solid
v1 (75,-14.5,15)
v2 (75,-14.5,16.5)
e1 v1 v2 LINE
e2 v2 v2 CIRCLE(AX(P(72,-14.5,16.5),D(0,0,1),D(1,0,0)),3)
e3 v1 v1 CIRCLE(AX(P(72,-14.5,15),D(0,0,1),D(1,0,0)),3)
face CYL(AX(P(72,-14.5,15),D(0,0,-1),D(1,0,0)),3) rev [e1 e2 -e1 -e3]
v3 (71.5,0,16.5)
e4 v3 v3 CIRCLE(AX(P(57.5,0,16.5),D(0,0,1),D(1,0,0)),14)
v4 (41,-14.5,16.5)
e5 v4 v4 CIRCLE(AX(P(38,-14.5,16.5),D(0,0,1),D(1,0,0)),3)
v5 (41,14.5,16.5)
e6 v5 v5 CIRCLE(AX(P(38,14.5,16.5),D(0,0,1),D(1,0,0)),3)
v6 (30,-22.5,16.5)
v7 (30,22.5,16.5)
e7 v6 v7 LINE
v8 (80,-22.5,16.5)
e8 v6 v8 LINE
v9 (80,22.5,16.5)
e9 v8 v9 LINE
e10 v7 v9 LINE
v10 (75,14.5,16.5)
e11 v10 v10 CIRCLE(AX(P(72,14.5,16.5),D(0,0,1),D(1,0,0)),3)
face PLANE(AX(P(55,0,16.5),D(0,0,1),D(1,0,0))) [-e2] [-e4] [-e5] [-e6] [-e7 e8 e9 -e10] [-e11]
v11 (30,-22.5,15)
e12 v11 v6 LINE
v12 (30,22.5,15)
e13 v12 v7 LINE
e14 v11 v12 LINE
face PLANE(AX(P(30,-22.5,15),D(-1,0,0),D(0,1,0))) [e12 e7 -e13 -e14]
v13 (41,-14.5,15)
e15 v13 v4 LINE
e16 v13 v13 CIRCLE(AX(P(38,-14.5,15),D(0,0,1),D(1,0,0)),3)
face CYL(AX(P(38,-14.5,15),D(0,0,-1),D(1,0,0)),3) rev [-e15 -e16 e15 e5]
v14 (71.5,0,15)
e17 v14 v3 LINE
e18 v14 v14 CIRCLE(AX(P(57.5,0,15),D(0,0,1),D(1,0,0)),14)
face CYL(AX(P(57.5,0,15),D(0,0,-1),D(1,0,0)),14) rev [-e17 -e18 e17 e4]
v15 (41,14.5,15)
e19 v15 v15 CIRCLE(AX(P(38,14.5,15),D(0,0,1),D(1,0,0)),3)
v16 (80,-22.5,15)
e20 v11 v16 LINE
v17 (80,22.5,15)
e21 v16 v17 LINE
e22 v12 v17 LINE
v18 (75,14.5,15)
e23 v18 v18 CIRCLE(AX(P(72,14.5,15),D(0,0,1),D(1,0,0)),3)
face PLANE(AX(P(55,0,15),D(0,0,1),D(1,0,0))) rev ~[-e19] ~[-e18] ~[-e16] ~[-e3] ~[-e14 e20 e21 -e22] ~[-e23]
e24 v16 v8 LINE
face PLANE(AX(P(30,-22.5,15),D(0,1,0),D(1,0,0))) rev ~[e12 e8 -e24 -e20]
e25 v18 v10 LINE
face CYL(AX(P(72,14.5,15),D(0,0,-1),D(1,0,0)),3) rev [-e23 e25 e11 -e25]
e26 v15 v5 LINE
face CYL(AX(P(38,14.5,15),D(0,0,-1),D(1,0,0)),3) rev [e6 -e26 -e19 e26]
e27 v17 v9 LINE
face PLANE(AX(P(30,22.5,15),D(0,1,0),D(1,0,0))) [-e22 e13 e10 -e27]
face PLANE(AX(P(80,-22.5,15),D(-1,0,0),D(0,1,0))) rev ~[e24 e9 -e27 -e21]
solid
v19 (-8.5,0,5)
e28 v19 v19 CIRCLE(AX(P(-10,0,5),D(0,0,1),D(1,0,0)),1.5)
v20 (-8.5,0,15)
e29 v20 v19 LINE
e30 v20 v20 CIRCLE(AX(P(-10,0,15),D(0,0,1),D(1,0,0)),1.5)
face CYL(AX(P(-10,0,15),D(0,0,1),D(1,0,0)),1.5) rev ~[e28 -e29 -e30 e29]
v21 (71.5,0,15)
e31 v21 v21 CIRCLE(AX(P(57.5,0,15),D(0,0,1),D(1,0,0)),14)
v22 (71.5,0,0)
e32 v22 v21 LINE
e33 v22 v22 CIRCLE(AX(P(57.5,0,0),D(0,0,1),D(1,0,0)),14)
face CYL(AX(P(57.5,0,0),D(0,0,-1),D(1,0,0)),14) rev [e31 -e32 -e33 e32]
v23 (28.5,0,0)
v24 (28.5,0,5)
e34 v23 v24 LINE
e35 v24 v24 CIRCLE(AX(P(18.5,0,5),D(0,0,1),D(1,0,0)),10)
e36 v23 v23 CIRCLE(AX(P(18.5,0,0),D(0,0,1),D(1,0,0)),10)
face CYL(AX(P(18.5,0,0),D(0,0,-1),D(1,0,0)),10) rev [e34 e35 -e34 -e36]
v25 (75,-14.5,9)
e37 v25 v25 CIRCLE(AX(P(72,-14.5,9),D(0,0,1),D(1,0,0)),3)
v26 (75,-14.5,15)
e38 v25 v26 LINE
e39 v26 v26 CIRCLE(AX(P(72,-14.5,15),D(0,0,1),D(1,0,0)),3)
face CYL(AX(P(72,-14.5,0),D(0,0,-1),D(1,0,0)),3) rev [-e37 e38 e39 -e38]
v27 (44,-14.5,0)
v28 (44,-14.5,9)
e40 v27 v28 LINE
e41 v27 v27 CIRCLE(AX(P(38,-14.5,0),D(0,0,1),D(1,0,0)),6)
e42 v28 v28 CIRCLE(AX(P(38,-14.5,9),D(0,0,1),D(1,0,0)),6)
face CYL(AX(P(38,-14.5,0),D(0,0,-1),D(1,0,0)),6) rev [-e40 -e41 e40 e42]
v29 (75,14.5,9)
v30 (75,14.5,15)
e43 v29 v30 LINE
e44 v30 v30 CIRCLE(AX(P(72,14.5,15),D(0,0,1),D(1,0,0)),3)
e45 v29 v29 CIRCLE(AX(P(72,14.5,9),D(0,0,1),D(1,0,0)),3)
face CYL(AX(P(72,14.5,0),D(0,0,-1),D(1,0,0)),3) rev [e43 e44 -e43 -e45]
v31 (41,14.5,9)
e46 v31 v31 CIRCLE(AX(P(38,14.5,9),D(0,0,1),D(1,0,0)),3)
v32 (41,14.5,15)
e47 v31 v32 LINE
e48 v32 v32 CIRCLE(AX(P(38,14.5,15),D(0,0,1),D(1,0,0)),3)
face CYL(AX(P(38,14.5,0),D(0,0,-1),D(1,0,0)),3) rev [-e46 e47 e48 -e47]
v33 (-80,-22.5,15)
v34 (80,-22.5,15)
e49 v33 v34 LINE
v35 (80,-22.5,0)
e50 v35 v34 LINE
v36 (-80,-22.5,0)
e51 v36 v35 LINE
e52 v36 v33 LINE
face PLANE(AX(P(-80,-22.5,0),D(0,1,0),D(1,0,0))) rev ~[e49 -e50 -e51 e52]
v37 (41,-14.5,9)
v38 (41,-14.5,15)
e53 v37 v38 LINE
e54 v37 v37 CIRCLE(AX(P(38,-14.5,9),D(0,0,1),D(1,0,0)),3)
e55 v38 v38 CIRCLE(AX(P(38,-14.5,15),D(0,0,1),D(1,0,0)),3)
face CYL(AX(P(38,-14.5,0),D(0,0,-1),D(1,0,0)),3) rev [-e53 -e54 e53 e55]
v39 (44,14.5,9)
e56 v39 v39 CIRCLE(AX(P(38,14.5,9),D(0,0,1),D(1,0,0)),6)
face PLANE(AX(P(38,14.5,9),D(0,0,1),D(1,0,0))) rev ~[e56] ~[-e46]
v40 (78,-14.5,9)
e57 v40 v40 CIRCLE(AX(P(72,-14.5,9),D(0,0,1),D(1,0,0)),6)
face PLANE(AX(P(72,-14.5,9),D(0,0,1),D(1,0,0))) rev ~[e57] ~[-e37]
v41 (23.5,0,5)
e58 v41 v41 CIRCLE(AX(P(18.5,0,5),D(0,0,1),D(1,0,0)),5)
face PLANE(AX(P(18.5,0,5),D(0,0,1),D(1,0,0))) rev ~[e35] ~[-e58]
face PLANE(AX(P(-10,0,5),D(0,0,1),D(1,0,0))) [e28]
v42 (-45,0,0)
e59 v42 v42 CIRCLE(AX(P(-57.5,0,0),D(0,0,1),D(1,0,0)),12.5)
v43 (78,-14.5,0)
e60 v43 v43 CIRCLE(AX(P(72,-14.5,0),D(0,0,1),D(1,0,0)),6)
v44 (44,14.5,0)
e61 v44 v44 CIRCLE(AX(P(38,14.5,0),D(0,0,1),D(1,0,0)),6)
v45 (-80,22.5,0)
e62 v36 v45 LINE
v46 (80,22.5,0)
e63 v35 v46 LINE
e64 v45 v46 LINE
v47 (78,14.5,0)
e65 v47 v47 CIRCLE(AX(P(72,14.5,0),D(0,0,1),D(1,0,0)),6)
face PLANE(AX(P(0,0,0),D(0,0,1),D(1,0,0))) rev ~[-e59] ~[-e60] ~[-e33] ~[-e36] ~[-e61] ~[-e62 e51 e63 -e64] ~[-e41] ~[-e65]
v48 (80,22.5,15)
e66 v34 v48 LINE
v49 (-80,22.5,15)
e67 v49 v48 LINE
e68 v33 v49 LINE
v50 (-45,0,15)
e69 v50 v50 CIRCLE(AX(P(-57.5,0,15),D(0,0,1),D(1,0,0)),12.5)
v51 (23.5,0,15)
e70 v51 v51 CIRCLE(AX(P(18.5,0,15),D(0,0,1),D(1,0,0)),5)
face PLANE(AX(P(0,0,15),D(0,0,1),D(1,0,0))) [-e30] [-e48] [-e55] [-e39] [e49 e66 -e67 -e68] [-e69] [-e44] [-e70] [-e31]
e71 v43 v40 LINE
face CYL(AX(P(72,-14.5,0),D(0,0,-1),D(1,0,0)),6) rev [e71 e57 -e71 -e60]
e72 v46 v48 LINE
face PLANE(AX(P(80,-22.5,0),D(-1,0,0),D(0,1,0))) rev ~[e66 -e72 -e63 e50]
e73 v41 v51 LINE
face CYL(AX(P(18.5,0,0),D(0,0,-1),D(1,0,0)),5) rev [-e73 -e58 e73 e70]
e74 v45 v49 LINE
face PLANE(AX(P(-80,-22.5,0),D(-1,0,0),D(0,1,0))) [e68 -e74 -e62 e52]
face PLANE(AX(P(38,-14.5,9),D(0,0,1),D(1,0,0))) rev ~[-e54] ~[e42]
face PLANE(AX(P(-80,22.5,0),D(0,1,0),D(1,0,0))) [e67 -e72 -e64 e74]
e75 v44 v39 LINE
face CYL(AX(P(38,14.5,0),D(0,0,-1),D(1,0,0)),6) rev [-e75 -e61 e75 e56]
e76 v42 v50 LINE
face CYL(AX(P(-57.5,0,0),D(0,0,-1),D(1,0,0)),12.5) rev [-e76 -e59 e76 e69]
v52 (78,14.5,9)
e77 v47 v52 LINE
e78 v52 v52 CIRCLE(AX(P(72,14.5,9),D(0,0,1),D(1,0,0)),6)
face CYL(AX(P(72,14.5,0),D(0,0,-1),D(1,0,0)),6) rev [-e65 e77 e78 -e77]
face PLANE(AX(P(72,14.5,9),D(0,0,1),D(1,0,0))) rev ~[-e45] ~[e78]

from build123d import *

# Parameters (mm, degrees)
F0_W     = 160
F0_H     = 45
F0_R     = 6
F0_R_2   = 12.5
F0_R_3   = 10
F0_R_4   = 14
F0_R_5   = 5
F0_R_6   = 3
F1_DEPTH = 15
F2_DEPTH = 5
F3_DEPTH = 9
F4_R     = 1.5
F5_DEPTH = 10
F6_W     = 50
F6_H     = 45
F6_R     = 3
F6_R_2   = 14
F7_DEPTH = 1.5


# Not quite as in the source:
# - a feature names something its author has since deleted; it is built from what else it names


with BuildPart() as f1:
    # F0 (on Top) → F1 (new body)
    with BuildSketch(Plane.XY):
        Rectangle(F0_W, F0_H)
        with Locations((38, -14.5)):
            Circle(F0_R, mode=Mode.SUBTRACT)
        with Locations((72, -14.5)):
            Circle(F0_R, mode=Mode.SUBTRACT)
        with Locations((-57.5, 0)):
            Circle(F0_R_2, mode=Mode.SUBTRACT)
        with Locations((18.5, 0)):
            Circle(F0_R_3, mode=Mode.SUBTRACT)
        with Locations((57.5, 0)):
            Circle(F0_R_4, mode=Mode.SUBTRACT)
        with Locations((38, 14.5)):
            Circle(F0_R, mode=Mode.SUBTRACT)
        with Locations((72, 14.5)):
            Circle(F0_R, mode=Mode.SUBTRACT)
        with Locations((18.5, 0)):
            Circle(F0_R_3)
        with Locations((18.5, 0)):
            Circle(F0_R_5, mode=Mode.SUBTRACT)
        with Locations((38, -14.5)):
            Circle(F0_R)
        with Locations((38, -14.5)):
            Circle(F0_R_6, mode=Mode.SUBTRACT)
        with Locations((72, -14.5)):
            Circle(F0_R)
        with Locations((72, -14.5)):
            Circle(F0_R_6, mode=Mode.SUBTRACT)
        with Locations((72, 14.5)):
            Circle(F0_R)
        with Locations((72, 14.5)):
            Circle(F0_R_6, mode=Mode.SUBTRACT)
        with Locations((38, 14.5)):
            Circle(F0_R)
        with Locations((38, 14.5)):
            Circle(F0_R_6, mode=Mode.SUBTRACT)
    extrude(amount=F1_DEPTH)

    # F0 (on Top) → F2 (cut)
    with BuildSketch(Plane.XY):
        with Locations((18.5, 0)):
            Circle(F0_R_3)
        with Locations((18.5, 0)):
            Circle(F0_R_5, mode=Mode.SUBTRACT)
    extrude(amount=F2_DEPTH, mode=Mode.SUBTRACT)

    # F0 (on Top) → F3 (cut)
    with BuildSketch(Plane.XY):
        with Locations((38, -14.5)):
            Circle(F0_R)
        with Locations((38, -14.5)):
            Circle(F0_R_6, mode=Mode.SUBTRACT)
        with Locations((72, -14.5)):
            Circle(F0_R)
        with Locations((72, -14.5)):
            Circle(F0_R_6, mode=Mode.SUBTRACT)
        with Locations((72, 14.5)):
            Circle(F0_R)
        with Locations((72, 14.5)):
            Circle(F0_R_6, mode=Mode.SUBTRACT)
        with Locations((38, 14.5)):
            Circle(F0_R)
        with Locations((38, 14.5)):
            Circle(F0_R_6, mode=Mode.SUBTRACT)
    extrude(amount=F3_DEPTH, mode=Mode.SUBTRACT)

    # F4 (on face) → F5 (cut)
    with BuildSketch(Plane.XY.offset(15)):
        with Locations((-10, 0)):
            Circle(F4_R)
    extrude(amount=-F5_DEPTH, mode=Mode.SUBTRACT)


with BuildPart() as f7:
    # F6 (on face) → F7 (new body)
    with BuildSketch(Plane.XY.offset(15)):
        with Locations((55, 0)):
            Rectangle(F6_W, F6_H)
        with Locations((38, -14.5)):
            Circle(F6_R, mode=Mode.SUBTRACT)
        with Locations((72, -14.5)):
            Circle(F6_R, mode=Mode.SUBTRACT)
        with Locations((57.5, 0)):
            Circle(F6_R_2, mode=Mode.SUBTRACT)
        with Locations((38, 14.5)):
            Circle(F6_R, mode=Mode.SUBTRACT)
        with Locations((72, 14.5)):
            Circle(F6_R, mode=Mode.SUBTRACT)
    extrude(amount=F7_DEPTH)


solid = Compound([f1.part, f7.part])
